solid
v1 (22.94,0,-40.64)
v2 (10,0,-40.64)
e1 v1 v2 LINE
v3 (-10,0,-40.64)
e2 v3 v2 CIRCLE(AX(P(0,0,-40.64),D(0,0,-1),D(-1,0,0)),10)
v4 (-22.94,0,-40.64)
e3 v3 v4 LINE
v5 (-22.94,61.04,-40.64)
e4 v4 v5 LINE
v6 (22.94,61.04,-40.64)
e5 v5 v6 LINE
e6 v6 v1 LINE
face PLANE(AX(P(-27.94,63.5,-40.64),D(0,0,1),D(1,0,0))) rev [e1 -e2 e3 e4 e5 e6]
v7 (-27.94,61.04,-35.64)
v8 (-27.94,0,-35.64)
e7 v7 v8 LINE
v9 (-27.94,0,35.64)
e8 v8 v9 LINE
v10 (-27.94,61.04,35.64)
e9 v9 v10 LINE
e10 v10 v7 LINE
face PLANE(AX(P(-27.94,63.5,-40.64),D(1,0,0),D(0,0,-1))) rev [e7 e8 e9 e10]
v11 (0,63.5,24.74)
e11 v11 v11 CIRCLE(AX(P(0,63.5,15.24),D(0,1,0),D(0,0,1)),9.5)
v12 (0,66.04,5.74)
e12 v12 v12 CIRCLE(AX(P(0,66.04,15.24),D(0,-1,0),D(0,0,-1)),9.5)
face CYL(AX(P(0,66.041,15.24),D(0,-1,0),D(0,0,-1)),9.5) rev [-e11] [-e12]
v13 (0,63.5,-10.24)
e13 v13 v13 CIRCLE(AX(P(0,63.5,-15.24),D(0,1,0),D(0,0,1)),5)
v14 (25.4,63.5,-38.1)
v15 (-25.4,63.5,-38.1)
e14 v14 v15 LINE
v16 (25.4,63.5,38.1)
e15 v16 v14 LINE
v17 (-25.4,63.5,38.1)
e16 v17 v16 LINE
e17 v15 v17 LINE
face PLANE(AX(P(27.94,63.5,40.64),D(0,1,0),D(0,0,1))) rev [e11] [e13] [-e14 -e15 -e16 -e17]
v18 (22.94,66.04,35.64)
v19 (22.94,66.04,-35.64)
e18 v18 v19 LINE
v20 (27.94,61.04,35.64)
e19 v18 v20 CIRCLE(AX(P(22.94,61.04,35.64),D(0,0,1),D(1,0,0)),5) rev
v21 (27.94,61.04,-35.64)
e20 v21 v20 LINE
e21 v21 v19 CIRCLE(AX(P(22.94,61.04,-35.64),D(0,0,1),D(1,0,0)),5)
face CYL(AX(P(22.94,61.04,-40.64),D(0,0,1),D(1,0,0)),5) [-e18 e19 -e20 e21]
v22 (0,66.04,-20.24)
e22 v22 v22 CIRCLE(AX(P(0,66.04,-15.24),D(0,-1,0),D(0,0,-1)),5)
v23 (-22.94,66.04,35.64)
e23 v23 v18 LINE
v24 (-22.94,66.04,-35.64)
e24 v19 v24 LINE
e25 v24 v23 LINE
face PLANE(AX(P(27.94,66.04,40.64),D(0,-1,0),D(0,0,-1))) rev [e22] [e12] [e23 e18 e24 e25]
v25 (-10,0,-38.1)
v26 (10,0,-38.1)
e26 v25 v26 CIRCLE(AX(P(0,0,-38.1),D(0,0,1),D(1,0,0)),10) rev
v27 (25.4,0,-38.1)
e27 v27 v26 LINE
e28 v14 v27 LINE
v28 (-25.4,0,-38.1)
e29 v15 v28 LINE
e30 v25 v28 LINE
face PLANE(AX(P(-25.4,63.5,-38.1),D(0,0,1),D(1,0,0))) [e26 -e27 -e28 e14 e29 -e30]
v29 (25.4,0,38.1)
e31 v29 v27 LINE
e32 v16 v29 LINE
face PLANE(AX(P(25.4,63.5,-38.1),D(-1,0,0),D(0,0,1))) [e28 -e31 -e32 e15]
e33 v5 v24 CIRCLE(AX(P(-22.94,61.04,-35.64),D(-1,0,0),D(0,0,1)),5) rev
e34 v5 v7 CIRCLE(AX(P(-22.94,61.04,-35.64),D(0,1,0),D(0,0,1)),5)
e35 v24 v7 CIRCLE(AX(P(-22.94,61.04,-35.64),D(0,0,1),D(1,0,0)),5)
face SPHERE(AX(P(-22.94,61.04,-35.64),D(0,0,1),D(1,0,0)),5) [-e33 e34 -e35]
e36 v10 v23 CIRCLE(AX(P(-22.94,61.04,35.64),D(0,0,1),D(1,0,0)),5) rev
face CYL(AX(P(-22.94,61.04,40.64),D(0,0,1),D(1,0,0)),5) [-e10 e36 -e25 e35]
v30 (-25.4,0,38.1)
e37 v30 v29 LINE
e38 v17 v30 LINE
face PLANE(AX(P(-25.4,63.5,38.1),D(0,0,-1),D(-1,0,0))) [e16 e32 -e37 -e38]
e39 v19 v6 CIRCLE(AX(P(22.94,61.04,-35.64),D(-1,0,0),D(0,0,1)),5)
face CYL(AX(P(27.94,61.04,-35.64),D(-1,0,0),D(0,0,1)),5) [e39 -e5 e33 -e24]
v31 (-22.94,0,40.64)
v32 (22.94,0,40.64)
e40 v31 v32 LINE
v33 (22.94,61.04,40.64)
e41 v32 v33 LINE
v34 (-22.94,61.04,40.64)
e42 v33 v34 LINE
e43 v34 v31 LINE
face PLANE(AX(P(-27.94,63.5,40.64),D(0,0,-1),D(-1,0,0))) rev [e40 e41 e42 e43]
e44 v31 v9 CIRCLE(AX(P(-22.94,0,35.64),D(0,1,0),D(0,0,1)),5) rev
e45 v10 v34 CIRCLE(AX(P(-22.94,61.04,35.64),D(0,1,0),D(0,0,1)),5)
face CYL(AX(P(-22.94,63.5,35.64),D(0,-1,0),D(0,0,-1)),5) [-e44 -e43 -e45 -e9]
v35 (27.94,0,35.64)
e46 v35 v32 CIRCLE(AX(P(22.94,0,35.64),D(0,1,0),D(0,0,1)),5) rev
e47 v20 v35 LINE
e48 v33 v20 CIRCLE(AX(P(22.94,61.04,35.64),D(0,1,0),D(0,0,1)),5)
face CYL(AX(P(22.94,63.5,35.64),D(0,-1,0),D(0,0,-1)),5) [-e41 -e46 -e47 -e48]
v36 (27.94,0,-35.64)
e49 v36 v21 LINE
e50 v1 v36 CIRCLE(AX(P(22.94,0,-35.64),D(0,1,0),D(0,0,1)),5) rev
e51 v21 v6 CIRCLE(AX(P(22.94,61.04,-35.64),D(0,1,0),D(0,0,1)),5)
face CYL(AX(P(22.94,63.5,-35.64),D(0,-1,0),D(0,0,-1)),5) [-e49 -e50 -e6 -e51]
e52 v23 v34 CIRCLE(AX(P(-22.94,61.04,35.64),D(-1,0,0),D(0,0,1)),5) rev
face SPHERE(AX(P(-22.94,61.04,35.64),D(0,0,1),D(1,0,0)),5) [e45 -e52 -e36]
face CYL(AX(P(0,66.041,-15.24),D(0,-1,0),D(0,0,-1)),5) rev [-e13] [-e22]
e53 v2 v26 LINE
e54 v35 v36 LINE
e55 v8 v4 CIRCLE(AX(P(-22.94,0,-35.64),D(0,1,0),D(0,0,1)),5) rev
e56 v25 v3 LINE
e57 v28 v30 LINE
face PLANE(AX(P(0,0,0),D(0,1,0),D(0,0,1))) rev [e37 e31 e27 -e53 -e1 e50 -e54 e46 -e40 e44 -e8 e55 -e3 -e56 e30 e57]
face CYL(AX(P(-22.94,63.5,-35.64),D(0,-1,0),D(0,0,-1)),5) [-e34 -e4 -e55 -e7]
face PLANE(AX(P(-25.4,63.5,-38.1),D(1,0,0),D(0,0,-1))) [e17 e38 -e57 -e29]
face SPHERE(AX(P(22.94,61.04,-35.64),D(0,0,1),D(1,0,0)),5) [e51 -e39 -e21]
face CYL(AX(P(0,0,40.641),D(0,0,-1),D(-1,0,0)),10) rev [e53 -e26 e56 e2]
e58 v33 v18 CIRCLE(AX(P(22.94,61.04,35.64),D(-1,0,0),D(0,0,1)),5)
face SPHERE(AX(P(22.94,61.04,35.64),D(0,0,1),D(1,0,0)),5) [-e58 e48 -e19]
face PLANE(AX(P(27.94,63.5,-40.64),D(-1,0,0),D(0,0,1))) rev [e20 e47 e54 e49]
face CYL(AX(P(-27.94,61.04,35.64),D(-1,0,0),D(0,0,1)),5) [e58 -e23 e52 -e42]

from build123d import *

# Parameters (mm, degrees)
SKETCH2_W                = 55.88
SKETCH2_H                = 81.28
SKETCH2_W_2              = 50.8
SKETCH2_H_2              = 76.2
BOSS_EXTRUDE1_DEPTH      = 63.5
BOSS_EXTRUDE2_DEPTH      = 27.94
BOSS_EXTRUDE2_DEPTH_BACK = 27.94
SKETCH3_W                = 81.28
SKETCH3_H                = 2.54
FILLET1_R                = 5
FILLET4_R                = 5
FILLET5_R                = 5
FILLET6_R                = 5
FILLET7_R                = 5
CUT_EXTRUDE1_REACH       = 84.423
SKETCH4_R                = 5
SKETCH4_R_2              = 9.5
CUT_EXTRUDE2_REACH       = 110.39
SKETCH6_R                = 10


with BuildPart() as part:
    # Sketch2 → Boss-Extrude1 (new body)
    with BuildSketch(Plane(origin=(0, 0, 0), x_dir=(1, 0, 0), z_dir=(0, 1, 0))):
        Rectangle(SKETCH2_W, SKETCH2_H)
        Rectangle(SKETCH2_W_2, SKETCH2_H_2, mode=Mode.SUBTRACT)
    extrude(amount=BOSS_EXTRUDE1_DEPTH)

    # Sketch3 → Boss-Extrude2 (add, two sides: drawn at the far end of the back side and taken through both)
    with BuildSketch(Plane(origin=(0, 0, 0), x_dir=(0, 0, -1), z_dir=(1, 0, 0)).offset(-BOSS_EXTRUDE2_DEPTH_BACK)):
        with Locations((0, 64.77)):
            Rectangle(SKETCH3_W, SKETCH3_H)
    extrude(amount=BOSS_EXTRUDE2_DEPTH + BOSS_EXTRUDE2_DEPTH_BACK)

    # Fillet1
    fillet1_edges = [part.edges().sort_by_distance(p)[0] for p in [
        (0, 66.04, 40.64),
        (0, 66.04, -40.64),
        (-27.94, 66.04, 0),
        (27.94, 66.04, 0),
    ]]
    fillet(fillet1_edges, radius=FILLET1_R)

    # Fillet4
    # the kernel refuses this fillet: 5 mm, written as the material it takes off along each edge
    with BuildSketch(Plane(origin=(-22.94, 61.04, -35.64), x_dir=(-1, 0, 0), z_dir=(0, 0, -1))) as fillet4_piece_1_section:
        Polygon((0, 0), (FILLET4_R, 0), (FILLET4_R, FILLET4_R), (0, FILLET4_R), align=None)
    fillet4_piece_1 = extrude(amount=FILLET4_R, mode=Mode.PRIVATE)
    fillet4_piece_1 = fillet4_piece_1 - Plane(origin=(-22.94, 61.04, -35.64), x_dir=(0.7071067811865475, -0.7071067811865475, 0), z_dir=(0, 0, -1)) * Sphere(FILLET4_R, mode=Mode.PRIVATE)
    add(fillet4_piece_1, mode=Mode.SUBTRACT)
    with BuildSketch(Plane(origin=(-27.94, -12.5, -40.64), x_dir=(1, 0, 0), z_dir=(0, 1, 0))) as fillet4_piece_2:
        with BuildLine():
            CenterArc((FILLET4_R, -FILLET4_R), FILLET4_R, 90, 90)
            Line((0, -FILLET4_R), (0, 0))
            Line((0, 0), (FILLET4_R, 0))
        make_face()
    extrude(amount=73.54, mode=Mode.SUBTRACT)

    # Fillet5
    # the kernel refuses this fillet: 5 mm, written as the material it takes off along each edge
    with BuildSketch(Plane(origin=(22.94, 61.04, -35.64), x_dir=(1, 0, 0), z_dir=(0, 0, -1))) as fillet5_piece_1_section:
        Polygon((0, 0), (FILLET5_R, 0), (FILLET5_R, -FILLET5_R), (0, -FILLET5_R), align=None)
    fillet5_piece_1 = extrude(amount=FILLET5_R, mode=Mode.PRIVATE)
    fillet5_piece_1 = fillet5_piece_1 - Plane(origin=(22.94, 61.04, -35.64), x_dir=(-0.7071067811865475, -0.7071067811865475, 0), z_dir=(0, 0, -1)) * Sphere(FILLET5_R, mode=Mode.PRIVATE)
    add(fillet5_piece_1, mode=Mode.SUBTRACT)
    with BuildSketch(Plane(origin=(27.94, 61.04, -40.64), x_dir=(-1, 0, 0), z_dir=(0, -1, 0))) as fillet5_piece_2:
        with BuildLine():
            CenterArc((FILLET5_R, -FILLET5_R), FILLET5_R, 90, 90)
            Line((0, -FILLET5_R), (0, 0))
            Line((0, 0), (FILLET5_R, 0))
        make_face()
    extrude(amount=73.54, mode=Mode.SUBTRACT)

    # Fillet6
    # the kernel refuses this fillet: 5 mm, written as the material it takes off along each edge
    with BuildSketch(Plane(origin=(22.94, 61.04, 35.64), x_dir=(1, 0, 0), z_dir=(0, 0, 1))) as fillet6_piece_1_section:
        Polygon((0, 0), (FILLET6_R, 0), (FILLET6_R, FILLET6_R), (0, FILLET6_R), align=None)
    fillet6_piece_1 = extrude(amount=FILLET6_R, mode=Mode.PRIVATE)
    fillet6_piece_1 = fillet6_piece_1 - Plane(origin=(22.94, 61.04, 35.64), x_dir=(-0.7071067811865475, -0.7071067811865475, 0), z_dir=(0, 0, 1)) * Sphere(FILLET6_R, mode=Mode.PRIVATE)
    add(fillet6_piece_1, mode=Mode.SUBTRACT)
    with BuildSketch(Plane(origin=(27.94, 61.04, 40.64), x_dir=(-1, 0, 0), z_dir=(0, -1, 0))) as fillet6_piece_2:
        with BuildLine():
            CenterArc((FILLET6_R, FILLET6_R), FILLET6_R, 180, 90)
            Line((0, FILLET6_R), (0, 0))
            Line((0, 0), (FILLET6_R, 0))
        make_face()
    extrude(amount=73.54, mode=Mode.SUBTRACT)

    # Fillet7
    # the kernel refuses this fillet: 5 mm, written as the material it takes off along each edge
    with BuildSketch(Plane(origin=(-22.94, 61.04, 35.64), x_dir=(-1, 0, 0), z_dir=(0, 0, 1))) as fillet7_piece_1_section:
        Polygon((0, 0), (FILLET7_R, 0), (FILLET7_R, -FILLET7_R), (0, -FILLET7_R), align=None)
    fillet7_piece_1 = extrude(amount=FILLET7_R, mode=Mode.PRIVATE)
    fillet7_piece_1 = fillet7_piece_1 - Plane(origin=(-22.94, 61.04, 35.64), x_dir=(0.7071067811865475, -0.7071067811865475, 0), z_dir=(0, 0, 1)) * Sphere(FILLET7_R, mode=Mode.PRIVATE)
    add(fillet7_piece_1, mode=Mode.SUBTRACT)
    with BuildSketch(Plane(origin=(-27.94, -12.5, 40.64), x_dir=(1, 0, 0), z_dir=(0, 1, 0))) as fillet7_piece_2:
        with BuildLine():
            CenterArc((FILLET7_R, FILLET7_R), FILLET7_R, 180, 90)
            Line((0, FILLET7_R), (0, 0))
            Line((0, 0), (FILLET7_R, 0))
        make_face()
    extrude(amount=73.54, mode=Mode.SUBTRACT)

    # Sketch4 → Cut-Extrude1 (cut, up to next)
    with BuildSketch(Plane(origin=(0, 0, 0), x_dir=(1, 0, 0), z_dir=(0, 1, 0)), mode=Mode.PRIVATE) as cut_extrude1_sk1:
        with Locations(Location((0, 15.24, 0), (0, 0, 90))):
            Circle(SKETCH4_R)
    cut_extrude1_tool1 = extrude(cut_extrude1_sk1.sketch, amount=CUT_EXTRUDE1_REACH, mode=Mode.PRIVATE) & part.part
    # Sketch4 → Cut-Extrude1 (cut, up to next)
    with BuildSketch(Plane(origin=(0, 0, 0), x_dir=(1, 0, 0), z_dir=(0, 1, 0)), mode=Mode.PRIVATE) as cut_extrude1_sk2:
        with Locations(Location((0, -15.24, 0), (0, 0, 90))):
            Circle(SKETCH4_R_2)
    cut_extrude1_tool2 = extrude(cut_extrude1_sk2.sketch, amount=CUT_EXTRUDE1_REACH, mode=Mode.PRIVATE) & part.part
    add(cut_extrude1_tool1.solids().sort_by_distance((0, 0, -15.24))[0], mode=Mode.SUBTRACT)
    add(cut_extrude1_tool2.solids().sort_by_distance((0, 0, 15.24))[0], mode=Mode.SUBTRACT)

    # Sketch6 → Cut-Extrude2 (cut, up to next)
    with BuildSketch(Plane(origin=(0, 0, -40.64), x_dir=(-1, 0, 0), z_dir=(0, 0, -1)), mode=Mode.PRIVATE) as cut_extrude2_sk1:
        Circle(SKETCH6_R)
    cut_extrude2_tool1 = extrude(cut_extrude2_sk1.sketch, amount=-CUT_EXTRUDE2_REACH, mode=Mode.PRIVATE) & part.part
    add(cut_extrude2_tool1.solids().sort_by_distance((0, 0, -40.64))[0], mode=Mode.SUBTRACT)


solid = part.part
